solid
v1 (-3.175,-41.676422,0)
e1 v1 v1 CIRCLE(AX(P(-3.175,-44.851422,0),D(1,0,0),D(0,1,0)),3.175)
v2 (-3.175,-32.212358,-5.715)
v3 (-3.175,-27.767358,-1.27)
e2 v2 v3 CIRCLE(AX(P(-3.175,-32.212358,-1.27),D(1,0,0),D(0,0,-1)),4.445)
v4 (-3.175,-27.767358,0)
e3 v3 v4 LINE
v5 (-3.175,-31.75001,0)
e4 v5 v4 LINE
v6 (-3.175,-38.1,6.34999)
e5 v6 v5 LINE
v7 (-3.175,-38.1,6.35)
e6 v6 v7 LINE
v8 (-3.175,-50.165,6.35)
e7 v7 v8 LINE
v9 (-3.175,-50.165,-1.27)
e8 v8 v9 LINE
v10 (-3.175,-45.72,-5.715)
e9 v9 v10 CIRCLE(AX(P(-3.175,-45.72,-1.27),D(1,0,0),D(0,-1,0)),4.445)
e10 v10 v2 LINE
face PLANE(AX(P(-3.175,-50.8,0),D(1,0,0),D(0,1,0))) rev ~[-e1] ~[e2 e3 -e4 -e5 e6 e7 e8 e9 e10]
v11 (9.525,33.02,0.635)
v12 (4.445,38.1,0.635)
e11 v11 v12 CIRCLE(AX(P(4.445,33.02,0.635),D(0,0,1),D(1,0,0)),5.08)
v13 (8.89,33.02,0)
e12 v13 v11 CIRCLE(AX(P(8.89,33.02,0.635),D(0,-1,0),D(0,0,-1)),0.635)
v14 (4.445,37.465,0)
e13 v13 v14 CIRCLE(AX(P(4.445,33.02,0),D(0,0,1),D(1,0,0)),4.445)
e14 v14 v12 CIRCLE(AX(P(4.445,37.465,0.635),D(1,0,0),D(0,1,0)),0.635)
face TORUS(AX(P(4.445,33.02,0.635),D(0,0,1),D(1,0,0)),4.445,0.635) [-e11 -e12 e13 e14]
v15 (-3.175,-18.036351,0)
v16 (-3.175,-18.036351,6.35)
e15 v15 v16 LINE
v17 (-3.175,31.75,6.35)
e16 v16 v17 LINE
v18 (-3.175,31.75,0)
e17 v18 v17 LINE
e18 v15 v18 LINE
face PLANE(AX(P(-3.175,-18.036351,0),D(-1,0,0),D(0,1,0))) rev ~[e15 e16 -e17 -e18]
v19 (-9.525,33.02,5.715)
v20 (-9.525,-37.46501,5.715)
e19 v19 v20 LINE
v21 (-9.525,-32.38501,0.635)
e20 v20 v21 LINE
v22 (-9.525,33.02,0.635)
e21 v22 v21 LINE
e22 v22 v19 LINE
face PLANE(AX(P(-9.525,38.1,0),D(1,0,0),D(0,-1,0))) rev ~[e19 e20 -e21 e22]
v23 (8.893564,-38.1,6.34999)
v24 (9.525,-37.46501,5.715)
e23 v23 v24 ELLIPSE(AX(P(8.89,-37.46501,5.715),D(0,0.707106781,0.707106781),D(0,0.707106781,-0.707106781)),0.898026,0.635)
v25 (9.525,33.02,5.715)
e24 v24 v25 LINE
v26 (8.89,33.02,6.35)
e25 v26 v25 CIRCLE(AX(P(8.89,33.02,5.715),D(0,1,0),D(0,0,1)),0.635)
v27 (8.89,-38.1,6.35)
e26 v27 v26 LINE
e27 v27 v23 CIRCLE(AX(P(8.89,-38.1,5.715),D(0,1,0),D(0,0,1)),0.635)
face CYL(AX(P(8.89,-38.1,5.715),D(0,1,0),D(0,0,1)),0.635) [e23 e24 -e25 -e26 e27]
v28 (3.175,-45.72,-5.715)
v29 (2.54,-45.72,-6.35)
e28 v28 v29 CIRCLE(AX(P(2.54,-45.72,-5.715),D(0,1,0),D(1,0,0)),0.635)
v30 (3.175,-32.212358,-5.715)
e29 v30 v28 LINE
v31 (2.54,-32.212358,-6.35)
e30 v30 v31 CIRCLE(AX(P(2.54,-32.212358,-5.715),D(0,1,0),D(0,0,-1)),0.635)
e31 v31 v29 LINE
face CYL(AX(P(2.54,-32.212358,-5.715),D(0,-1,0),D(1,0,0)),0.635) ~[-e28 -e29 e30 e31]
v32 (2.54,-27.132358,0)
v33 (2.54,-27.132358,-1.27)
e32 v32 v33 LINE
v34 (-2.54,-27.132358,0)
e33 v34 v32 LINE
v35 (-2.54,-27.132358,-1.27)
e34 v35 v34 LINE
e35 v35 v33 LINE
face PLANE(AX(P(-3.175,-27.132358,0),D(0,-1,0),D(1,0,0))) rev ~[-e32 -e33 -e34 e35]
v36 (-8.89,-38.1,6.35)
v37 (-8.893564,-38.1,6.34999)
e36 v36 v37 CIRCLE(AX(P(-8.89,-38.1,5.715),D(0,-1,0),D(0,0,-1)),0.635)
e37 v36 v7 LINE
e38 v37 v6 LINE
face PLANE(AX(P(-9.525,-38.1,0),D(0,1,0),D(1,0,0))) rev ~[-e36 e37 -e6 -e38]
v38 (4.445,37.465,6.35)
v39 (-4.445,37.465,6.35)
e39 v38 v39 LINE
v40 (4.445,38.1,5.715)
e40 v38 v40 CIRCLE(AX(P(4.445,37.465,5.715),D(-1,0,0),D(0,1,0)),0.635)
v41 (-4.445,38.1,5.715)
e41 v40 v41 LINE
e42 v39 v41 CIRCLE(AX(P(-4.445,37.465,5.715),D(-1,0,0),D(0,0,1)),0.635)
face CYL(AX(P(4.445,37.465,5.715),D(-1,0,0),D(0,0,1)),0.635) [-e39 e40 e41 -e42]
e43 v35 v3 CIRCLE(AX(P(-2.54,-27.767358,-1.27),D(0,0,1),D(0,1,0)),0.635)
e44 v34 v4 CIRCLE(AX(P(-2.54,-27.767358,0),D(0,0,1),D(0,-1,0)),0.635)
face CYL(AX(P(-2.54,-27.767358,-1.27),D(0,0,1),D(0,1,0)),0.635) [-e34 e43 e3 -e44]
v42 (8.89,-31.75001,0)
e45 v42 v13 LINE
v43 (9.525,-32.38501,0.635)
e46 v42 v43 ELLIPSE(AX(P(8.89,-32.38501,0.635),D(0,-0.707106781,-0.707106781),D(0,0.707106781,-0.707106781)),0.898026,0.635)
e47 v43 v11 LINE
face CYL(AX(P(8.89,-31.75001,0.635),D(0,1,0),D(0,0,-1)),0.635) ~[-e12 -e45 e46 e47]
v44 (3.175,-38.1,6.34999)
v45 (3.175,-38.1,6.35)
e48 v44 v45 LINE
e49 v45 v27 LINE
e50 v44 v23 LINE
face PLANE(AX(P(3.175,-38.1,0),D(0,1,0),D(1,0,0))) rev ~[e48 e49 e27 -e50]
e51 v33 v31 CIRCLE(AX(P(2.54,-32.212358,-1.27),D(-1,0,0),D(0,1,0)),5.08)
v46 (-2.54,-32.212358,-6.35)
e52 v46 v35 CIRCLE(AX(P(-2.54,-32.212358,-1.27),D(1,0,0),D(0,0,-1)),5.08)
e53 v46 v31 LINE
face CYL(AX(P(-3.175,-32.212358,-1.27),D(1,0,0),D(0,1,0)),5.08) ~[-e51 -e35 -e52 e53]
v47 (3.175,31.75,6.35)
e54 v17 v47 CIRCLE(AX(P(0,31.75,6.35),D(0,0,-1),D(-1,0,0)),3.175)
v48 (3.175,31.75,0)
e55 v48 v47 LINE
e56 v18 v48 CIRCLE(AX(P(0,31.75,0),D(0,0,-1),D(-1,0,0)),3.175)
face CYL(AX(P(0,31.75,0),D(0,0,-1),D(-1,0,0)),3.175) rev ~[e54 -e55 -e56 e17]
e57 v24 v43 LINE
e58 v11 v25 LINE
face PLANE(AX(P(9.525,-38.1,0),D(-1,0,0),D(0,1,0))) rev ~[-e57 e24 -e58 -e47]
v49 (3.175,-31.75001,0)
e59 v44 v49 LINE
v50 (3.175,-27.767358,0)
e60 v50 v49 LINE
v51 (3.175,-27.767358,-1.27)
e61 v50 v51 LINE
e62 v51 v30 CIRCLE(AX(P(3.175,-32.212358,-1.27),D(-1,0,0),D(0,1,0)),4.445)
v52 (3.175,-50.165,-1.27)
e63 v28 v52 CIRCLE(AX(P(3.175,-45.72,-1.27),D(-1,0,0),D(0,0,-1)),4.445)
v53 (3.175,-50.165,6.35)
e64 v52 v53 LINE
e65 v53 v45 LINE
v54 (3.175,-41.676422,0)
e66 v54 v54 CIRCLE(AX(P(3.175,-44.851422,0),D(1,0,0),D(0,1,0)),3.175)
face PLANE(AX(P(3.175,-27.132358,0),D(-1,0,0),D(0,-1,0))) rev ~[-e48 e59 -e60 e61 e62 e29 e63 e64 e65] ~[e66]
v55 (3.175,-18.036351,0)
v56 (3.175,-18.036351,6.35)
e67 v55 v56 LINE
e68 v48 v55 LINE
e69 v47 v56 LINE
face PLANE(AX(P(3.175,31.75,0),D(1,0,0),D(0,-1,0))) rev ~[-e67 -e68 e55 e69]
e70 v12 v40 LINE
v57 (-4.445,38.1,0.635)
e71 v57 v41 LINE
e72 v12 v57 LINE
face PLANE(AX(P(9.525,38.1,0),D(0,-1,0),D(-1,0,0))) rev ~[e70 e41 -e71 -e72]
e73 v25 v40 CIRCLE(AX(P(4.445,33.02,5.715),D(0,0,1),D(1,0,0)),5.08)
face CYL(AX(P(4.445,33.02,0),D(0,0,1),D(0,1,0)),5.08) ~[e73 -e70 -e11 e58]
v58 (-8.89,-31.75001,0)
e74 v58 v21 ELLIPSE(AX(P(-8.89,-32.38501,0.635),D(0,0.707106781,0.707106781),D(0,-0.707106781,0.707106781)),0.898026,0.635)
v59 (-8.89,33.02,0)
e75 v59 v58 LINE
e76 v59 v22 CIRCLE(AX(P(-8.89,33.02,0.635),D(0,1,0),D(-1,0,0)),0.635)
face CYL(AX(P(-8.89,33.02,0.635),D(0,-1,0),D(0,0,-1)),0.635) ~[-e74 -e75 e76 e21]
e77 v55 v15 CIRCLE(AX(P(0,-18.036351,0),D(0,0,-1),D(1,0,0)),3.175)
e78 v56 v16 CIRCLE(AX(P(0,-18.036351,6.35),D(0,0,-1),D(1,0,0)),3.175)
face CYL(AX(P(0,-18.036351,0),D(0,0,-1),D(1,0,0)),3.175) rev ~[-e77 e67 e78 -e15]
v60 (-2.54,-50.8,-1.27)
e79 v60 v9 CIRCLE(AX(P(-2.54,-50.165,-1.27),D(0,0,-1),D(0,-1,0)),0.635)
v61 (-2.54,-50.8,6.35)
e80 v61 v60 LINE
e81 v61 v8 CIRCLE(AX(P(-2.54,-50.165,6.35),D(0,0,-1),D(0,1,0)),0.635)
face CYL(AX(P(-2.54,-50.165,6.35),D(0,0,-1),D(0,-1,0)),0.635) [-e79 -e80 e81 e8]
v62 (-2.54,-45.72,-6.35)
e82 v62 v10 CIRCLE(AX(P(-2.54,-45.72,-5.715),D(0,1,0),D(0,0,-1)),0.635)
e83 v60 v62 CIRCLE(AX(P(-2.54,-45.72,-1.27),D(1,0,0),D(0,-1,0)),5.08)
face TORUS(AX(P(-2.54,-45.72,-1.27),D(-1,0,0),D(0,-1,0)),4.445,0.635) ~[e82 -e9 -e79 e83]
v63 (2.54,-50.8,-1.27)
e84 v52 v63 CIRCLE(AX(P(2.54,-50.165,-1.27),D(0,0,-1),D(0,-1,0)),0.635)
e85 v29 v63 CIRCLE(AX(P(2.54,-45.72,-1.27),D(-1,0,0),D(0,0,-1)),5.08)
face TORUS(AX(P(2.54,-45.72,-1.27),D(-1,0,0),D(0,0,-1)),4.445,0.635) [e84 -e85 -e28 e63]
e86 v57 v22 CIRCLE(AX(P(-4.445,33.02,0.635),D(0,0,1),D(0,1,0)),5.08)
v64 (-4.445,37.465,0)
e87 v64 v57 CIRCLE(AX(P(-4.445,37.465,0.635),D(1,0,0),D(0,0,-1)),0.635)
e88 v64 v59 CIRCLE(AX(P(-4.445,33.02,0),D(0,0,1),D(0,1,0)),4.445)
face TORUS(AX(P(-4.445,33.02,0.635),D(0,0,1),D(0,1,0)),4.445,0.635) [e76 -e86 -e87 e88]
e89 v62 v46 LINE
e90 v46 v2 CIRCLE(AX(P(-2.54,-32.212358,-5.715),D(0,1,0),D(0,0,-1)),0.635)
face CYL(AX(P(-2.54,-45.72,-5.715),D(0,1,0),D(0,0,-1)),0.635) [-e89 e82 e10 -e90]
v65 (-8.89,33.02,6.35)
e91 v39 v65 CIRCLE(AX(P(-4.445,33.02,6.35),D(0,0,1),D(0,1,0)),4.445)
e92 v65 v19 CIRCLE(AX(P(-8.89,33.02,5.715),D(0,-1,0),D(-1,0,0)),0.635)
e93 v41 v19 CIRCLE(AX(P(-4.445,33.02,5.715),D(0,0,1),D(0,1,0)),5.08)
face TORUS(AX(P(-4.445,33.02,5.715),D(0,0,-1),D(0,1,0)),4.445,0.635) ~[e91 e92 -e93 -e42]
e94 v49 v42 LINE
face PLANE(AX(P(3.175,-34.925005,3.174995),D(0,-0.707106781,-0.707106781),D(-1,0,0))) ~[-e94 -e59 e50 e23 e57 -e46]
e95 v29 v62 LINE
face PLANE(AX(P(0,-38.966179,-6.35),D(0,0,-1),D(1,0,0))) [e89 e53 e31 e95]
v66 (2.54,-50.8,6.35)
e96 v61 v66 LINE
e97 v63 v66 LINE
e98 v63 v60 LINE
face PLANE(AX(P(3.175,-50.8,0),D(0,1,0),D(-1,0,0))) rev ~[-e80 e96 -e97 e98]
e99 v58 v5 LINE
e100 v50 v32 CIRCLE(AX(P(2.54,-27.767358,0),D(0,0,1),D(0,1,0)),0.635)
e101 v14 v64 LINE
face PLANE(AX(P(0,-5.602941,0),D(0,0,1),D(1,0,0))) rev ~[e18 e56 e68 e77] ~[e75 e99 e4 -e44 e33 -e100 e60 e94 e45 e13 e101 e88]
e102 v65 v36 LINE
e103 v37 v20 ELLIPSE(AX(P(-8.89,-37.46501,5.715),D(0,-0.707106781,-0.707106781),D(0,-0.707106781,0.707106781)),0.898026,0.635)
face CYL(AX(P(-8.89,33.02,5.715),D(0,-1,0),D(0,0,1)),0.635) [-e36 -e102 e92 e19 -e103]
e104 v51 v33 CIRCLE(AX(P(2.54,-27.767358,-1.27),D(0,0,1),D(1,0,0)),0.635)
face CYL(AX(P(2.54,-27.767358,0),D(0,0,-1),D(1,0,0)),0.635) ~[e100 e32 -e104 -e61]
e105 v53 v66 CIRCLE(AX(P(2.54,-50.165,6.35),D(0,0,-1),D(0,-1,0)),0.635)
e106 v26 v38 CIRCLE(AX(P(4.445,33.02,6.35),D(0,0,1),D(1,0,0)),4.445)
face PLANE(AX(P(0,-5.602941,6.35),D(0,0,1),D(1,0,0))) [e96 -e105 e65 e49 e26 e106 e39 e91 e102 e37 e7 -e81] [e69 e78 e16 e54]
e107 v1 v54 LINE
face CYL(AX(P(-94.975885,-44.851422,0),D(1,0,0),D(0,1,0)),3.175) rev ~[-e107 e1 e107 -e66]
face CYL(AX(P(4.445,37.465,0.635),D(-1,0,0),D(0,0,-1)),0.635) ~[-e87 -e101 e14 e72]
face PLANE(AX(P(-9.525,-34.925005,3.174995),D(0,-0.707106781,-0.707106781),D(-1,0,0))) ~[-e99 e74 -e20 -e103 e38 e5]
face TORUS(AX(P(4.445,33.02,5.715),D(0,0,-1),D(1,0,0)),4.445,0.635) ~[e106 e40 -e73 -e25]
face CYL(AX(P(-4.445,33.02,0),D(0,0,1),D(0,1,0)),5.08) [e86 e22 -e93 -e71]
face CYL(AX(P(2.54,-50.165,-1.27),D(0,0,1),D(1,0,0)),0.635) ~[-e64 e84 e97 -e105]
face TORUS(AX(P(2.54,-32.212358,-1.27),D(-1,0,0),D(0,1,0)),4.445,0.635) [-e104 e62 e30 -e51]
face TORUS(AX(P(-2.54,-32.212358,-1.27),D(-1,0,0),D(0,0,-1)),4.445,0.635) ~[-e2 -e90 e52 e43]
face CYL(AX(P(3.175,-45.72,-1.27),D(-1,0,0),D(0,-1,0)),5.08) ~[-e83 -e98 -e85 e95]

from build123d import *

# Parameters (mm, degrees)
F1_DEPTH = 6.35
F3_DEPTH = 6.35
F5_D     = 6.35
F6_R     = 5.08
F7_R     = 5.08
F8_SIZE  = 6.34999
F9_R     = 5.08
F10_R    = 0.635


# Not quite as in the source:
# - a fillet or chamfer is up to 0.001 mm smaller than in the source, because OpenCascade refuses the exact size
# - a feature names something its author has since deleted; it is built from what else it names


with BuildPart() as f1:
    # F0 (on Top) → F1 (new body)
    with BuildSketch(Plane.XY):
        Polygon((9.525, 38.1), (-9.525, 38.1), (-9.525, -38.1), (-3.175, -38.1), (-3.175, -50.8), (3.175, -50.8), (3.175, -38.1), (9.525, -38.1), align=None)
        with BuildLine():
            ThreePointArc((3.175, -18.0363506079), (0, -21.2113506079), (-3.175, -18.0363506079))
            Line((-3.175, -18.0363506079), (-3.175, 31.75))
            ThreePointArc((-3.175, 31.75), (0, 34.925), (3.175, 31.75))
            Line((3.175, 31.75), (3.175, -18.0363506079))
        make_face(mode=Mode.SUBTRACT)
    extrude(amount=F1_DEPTH)

    # F2 (on face) → F3 (join)
    with BuildSketch(Plane(origin=(0, 0, 0), x_dir=(1, 0, 0), z_dir=(0, 0, -1))):
        Polygon((3.175, 38.1), (3.175, 50.8), (-3.175, 50.8), (-3.175, 38.1), (-3.175, 27.132358402), (3.175, 27.132358402), align=None)
    extrude(amount=F3_DEPTH)

    # F5 (through all)
    with Locations(Plane(origin=(-3.175, 0, 0), x_dir=(0, -1, 0), z_dir=(-1, 0, 0))):
        with Locations((44.8514223099, 0)):
            Hole(F5_D / 2)

    # F6
    f6_edges = [f1.edges().sort_by_distance(p)[0] for p in [
        (0, -50.8, -6.35),
    ]]
    fillet(f6_edges, radius=F6_R)

    # F7
    f7_edges = [f1.edges().sort_by_distance(p)[0] for p in [
        (-9.525, 38.1, 3.175),
        (9.525, 38.1, 3.175),
    ]]
    fillet(f7_edges, radius=F7_R)

    # F8 (size 6.35 in the source; OpenCascade refuses exactly that, so slightly less here)
    f8_edges = [f1.edges().sort_by_distance(p)[0] for p in [
        (6.35, -38.1, 0),
        (-6.35, -38.1, 0),
    ]]
    chamfer(f8_edges, length=F8_SIZE)

    # F9
    f9_edges = [f1.edges().sort_by_distance(p)[0] for p in [
        (0, -27.132358, -6.35),
    ]]
    fillet(f9_edges, radius=F9_R)

    # F10
    f10_edges = [f1.edges().sort_by_distance(p)[0] for p in [
        (-3.175, -50.8, 2.54),
        (3.175, -50.8, 2.54),
        (-9.525, 0.634995, 0),
        (9.525, -2.54, 6.35),
    ]]
    fillet(f10_edges, radius=F10_R)


solid = f1.part
